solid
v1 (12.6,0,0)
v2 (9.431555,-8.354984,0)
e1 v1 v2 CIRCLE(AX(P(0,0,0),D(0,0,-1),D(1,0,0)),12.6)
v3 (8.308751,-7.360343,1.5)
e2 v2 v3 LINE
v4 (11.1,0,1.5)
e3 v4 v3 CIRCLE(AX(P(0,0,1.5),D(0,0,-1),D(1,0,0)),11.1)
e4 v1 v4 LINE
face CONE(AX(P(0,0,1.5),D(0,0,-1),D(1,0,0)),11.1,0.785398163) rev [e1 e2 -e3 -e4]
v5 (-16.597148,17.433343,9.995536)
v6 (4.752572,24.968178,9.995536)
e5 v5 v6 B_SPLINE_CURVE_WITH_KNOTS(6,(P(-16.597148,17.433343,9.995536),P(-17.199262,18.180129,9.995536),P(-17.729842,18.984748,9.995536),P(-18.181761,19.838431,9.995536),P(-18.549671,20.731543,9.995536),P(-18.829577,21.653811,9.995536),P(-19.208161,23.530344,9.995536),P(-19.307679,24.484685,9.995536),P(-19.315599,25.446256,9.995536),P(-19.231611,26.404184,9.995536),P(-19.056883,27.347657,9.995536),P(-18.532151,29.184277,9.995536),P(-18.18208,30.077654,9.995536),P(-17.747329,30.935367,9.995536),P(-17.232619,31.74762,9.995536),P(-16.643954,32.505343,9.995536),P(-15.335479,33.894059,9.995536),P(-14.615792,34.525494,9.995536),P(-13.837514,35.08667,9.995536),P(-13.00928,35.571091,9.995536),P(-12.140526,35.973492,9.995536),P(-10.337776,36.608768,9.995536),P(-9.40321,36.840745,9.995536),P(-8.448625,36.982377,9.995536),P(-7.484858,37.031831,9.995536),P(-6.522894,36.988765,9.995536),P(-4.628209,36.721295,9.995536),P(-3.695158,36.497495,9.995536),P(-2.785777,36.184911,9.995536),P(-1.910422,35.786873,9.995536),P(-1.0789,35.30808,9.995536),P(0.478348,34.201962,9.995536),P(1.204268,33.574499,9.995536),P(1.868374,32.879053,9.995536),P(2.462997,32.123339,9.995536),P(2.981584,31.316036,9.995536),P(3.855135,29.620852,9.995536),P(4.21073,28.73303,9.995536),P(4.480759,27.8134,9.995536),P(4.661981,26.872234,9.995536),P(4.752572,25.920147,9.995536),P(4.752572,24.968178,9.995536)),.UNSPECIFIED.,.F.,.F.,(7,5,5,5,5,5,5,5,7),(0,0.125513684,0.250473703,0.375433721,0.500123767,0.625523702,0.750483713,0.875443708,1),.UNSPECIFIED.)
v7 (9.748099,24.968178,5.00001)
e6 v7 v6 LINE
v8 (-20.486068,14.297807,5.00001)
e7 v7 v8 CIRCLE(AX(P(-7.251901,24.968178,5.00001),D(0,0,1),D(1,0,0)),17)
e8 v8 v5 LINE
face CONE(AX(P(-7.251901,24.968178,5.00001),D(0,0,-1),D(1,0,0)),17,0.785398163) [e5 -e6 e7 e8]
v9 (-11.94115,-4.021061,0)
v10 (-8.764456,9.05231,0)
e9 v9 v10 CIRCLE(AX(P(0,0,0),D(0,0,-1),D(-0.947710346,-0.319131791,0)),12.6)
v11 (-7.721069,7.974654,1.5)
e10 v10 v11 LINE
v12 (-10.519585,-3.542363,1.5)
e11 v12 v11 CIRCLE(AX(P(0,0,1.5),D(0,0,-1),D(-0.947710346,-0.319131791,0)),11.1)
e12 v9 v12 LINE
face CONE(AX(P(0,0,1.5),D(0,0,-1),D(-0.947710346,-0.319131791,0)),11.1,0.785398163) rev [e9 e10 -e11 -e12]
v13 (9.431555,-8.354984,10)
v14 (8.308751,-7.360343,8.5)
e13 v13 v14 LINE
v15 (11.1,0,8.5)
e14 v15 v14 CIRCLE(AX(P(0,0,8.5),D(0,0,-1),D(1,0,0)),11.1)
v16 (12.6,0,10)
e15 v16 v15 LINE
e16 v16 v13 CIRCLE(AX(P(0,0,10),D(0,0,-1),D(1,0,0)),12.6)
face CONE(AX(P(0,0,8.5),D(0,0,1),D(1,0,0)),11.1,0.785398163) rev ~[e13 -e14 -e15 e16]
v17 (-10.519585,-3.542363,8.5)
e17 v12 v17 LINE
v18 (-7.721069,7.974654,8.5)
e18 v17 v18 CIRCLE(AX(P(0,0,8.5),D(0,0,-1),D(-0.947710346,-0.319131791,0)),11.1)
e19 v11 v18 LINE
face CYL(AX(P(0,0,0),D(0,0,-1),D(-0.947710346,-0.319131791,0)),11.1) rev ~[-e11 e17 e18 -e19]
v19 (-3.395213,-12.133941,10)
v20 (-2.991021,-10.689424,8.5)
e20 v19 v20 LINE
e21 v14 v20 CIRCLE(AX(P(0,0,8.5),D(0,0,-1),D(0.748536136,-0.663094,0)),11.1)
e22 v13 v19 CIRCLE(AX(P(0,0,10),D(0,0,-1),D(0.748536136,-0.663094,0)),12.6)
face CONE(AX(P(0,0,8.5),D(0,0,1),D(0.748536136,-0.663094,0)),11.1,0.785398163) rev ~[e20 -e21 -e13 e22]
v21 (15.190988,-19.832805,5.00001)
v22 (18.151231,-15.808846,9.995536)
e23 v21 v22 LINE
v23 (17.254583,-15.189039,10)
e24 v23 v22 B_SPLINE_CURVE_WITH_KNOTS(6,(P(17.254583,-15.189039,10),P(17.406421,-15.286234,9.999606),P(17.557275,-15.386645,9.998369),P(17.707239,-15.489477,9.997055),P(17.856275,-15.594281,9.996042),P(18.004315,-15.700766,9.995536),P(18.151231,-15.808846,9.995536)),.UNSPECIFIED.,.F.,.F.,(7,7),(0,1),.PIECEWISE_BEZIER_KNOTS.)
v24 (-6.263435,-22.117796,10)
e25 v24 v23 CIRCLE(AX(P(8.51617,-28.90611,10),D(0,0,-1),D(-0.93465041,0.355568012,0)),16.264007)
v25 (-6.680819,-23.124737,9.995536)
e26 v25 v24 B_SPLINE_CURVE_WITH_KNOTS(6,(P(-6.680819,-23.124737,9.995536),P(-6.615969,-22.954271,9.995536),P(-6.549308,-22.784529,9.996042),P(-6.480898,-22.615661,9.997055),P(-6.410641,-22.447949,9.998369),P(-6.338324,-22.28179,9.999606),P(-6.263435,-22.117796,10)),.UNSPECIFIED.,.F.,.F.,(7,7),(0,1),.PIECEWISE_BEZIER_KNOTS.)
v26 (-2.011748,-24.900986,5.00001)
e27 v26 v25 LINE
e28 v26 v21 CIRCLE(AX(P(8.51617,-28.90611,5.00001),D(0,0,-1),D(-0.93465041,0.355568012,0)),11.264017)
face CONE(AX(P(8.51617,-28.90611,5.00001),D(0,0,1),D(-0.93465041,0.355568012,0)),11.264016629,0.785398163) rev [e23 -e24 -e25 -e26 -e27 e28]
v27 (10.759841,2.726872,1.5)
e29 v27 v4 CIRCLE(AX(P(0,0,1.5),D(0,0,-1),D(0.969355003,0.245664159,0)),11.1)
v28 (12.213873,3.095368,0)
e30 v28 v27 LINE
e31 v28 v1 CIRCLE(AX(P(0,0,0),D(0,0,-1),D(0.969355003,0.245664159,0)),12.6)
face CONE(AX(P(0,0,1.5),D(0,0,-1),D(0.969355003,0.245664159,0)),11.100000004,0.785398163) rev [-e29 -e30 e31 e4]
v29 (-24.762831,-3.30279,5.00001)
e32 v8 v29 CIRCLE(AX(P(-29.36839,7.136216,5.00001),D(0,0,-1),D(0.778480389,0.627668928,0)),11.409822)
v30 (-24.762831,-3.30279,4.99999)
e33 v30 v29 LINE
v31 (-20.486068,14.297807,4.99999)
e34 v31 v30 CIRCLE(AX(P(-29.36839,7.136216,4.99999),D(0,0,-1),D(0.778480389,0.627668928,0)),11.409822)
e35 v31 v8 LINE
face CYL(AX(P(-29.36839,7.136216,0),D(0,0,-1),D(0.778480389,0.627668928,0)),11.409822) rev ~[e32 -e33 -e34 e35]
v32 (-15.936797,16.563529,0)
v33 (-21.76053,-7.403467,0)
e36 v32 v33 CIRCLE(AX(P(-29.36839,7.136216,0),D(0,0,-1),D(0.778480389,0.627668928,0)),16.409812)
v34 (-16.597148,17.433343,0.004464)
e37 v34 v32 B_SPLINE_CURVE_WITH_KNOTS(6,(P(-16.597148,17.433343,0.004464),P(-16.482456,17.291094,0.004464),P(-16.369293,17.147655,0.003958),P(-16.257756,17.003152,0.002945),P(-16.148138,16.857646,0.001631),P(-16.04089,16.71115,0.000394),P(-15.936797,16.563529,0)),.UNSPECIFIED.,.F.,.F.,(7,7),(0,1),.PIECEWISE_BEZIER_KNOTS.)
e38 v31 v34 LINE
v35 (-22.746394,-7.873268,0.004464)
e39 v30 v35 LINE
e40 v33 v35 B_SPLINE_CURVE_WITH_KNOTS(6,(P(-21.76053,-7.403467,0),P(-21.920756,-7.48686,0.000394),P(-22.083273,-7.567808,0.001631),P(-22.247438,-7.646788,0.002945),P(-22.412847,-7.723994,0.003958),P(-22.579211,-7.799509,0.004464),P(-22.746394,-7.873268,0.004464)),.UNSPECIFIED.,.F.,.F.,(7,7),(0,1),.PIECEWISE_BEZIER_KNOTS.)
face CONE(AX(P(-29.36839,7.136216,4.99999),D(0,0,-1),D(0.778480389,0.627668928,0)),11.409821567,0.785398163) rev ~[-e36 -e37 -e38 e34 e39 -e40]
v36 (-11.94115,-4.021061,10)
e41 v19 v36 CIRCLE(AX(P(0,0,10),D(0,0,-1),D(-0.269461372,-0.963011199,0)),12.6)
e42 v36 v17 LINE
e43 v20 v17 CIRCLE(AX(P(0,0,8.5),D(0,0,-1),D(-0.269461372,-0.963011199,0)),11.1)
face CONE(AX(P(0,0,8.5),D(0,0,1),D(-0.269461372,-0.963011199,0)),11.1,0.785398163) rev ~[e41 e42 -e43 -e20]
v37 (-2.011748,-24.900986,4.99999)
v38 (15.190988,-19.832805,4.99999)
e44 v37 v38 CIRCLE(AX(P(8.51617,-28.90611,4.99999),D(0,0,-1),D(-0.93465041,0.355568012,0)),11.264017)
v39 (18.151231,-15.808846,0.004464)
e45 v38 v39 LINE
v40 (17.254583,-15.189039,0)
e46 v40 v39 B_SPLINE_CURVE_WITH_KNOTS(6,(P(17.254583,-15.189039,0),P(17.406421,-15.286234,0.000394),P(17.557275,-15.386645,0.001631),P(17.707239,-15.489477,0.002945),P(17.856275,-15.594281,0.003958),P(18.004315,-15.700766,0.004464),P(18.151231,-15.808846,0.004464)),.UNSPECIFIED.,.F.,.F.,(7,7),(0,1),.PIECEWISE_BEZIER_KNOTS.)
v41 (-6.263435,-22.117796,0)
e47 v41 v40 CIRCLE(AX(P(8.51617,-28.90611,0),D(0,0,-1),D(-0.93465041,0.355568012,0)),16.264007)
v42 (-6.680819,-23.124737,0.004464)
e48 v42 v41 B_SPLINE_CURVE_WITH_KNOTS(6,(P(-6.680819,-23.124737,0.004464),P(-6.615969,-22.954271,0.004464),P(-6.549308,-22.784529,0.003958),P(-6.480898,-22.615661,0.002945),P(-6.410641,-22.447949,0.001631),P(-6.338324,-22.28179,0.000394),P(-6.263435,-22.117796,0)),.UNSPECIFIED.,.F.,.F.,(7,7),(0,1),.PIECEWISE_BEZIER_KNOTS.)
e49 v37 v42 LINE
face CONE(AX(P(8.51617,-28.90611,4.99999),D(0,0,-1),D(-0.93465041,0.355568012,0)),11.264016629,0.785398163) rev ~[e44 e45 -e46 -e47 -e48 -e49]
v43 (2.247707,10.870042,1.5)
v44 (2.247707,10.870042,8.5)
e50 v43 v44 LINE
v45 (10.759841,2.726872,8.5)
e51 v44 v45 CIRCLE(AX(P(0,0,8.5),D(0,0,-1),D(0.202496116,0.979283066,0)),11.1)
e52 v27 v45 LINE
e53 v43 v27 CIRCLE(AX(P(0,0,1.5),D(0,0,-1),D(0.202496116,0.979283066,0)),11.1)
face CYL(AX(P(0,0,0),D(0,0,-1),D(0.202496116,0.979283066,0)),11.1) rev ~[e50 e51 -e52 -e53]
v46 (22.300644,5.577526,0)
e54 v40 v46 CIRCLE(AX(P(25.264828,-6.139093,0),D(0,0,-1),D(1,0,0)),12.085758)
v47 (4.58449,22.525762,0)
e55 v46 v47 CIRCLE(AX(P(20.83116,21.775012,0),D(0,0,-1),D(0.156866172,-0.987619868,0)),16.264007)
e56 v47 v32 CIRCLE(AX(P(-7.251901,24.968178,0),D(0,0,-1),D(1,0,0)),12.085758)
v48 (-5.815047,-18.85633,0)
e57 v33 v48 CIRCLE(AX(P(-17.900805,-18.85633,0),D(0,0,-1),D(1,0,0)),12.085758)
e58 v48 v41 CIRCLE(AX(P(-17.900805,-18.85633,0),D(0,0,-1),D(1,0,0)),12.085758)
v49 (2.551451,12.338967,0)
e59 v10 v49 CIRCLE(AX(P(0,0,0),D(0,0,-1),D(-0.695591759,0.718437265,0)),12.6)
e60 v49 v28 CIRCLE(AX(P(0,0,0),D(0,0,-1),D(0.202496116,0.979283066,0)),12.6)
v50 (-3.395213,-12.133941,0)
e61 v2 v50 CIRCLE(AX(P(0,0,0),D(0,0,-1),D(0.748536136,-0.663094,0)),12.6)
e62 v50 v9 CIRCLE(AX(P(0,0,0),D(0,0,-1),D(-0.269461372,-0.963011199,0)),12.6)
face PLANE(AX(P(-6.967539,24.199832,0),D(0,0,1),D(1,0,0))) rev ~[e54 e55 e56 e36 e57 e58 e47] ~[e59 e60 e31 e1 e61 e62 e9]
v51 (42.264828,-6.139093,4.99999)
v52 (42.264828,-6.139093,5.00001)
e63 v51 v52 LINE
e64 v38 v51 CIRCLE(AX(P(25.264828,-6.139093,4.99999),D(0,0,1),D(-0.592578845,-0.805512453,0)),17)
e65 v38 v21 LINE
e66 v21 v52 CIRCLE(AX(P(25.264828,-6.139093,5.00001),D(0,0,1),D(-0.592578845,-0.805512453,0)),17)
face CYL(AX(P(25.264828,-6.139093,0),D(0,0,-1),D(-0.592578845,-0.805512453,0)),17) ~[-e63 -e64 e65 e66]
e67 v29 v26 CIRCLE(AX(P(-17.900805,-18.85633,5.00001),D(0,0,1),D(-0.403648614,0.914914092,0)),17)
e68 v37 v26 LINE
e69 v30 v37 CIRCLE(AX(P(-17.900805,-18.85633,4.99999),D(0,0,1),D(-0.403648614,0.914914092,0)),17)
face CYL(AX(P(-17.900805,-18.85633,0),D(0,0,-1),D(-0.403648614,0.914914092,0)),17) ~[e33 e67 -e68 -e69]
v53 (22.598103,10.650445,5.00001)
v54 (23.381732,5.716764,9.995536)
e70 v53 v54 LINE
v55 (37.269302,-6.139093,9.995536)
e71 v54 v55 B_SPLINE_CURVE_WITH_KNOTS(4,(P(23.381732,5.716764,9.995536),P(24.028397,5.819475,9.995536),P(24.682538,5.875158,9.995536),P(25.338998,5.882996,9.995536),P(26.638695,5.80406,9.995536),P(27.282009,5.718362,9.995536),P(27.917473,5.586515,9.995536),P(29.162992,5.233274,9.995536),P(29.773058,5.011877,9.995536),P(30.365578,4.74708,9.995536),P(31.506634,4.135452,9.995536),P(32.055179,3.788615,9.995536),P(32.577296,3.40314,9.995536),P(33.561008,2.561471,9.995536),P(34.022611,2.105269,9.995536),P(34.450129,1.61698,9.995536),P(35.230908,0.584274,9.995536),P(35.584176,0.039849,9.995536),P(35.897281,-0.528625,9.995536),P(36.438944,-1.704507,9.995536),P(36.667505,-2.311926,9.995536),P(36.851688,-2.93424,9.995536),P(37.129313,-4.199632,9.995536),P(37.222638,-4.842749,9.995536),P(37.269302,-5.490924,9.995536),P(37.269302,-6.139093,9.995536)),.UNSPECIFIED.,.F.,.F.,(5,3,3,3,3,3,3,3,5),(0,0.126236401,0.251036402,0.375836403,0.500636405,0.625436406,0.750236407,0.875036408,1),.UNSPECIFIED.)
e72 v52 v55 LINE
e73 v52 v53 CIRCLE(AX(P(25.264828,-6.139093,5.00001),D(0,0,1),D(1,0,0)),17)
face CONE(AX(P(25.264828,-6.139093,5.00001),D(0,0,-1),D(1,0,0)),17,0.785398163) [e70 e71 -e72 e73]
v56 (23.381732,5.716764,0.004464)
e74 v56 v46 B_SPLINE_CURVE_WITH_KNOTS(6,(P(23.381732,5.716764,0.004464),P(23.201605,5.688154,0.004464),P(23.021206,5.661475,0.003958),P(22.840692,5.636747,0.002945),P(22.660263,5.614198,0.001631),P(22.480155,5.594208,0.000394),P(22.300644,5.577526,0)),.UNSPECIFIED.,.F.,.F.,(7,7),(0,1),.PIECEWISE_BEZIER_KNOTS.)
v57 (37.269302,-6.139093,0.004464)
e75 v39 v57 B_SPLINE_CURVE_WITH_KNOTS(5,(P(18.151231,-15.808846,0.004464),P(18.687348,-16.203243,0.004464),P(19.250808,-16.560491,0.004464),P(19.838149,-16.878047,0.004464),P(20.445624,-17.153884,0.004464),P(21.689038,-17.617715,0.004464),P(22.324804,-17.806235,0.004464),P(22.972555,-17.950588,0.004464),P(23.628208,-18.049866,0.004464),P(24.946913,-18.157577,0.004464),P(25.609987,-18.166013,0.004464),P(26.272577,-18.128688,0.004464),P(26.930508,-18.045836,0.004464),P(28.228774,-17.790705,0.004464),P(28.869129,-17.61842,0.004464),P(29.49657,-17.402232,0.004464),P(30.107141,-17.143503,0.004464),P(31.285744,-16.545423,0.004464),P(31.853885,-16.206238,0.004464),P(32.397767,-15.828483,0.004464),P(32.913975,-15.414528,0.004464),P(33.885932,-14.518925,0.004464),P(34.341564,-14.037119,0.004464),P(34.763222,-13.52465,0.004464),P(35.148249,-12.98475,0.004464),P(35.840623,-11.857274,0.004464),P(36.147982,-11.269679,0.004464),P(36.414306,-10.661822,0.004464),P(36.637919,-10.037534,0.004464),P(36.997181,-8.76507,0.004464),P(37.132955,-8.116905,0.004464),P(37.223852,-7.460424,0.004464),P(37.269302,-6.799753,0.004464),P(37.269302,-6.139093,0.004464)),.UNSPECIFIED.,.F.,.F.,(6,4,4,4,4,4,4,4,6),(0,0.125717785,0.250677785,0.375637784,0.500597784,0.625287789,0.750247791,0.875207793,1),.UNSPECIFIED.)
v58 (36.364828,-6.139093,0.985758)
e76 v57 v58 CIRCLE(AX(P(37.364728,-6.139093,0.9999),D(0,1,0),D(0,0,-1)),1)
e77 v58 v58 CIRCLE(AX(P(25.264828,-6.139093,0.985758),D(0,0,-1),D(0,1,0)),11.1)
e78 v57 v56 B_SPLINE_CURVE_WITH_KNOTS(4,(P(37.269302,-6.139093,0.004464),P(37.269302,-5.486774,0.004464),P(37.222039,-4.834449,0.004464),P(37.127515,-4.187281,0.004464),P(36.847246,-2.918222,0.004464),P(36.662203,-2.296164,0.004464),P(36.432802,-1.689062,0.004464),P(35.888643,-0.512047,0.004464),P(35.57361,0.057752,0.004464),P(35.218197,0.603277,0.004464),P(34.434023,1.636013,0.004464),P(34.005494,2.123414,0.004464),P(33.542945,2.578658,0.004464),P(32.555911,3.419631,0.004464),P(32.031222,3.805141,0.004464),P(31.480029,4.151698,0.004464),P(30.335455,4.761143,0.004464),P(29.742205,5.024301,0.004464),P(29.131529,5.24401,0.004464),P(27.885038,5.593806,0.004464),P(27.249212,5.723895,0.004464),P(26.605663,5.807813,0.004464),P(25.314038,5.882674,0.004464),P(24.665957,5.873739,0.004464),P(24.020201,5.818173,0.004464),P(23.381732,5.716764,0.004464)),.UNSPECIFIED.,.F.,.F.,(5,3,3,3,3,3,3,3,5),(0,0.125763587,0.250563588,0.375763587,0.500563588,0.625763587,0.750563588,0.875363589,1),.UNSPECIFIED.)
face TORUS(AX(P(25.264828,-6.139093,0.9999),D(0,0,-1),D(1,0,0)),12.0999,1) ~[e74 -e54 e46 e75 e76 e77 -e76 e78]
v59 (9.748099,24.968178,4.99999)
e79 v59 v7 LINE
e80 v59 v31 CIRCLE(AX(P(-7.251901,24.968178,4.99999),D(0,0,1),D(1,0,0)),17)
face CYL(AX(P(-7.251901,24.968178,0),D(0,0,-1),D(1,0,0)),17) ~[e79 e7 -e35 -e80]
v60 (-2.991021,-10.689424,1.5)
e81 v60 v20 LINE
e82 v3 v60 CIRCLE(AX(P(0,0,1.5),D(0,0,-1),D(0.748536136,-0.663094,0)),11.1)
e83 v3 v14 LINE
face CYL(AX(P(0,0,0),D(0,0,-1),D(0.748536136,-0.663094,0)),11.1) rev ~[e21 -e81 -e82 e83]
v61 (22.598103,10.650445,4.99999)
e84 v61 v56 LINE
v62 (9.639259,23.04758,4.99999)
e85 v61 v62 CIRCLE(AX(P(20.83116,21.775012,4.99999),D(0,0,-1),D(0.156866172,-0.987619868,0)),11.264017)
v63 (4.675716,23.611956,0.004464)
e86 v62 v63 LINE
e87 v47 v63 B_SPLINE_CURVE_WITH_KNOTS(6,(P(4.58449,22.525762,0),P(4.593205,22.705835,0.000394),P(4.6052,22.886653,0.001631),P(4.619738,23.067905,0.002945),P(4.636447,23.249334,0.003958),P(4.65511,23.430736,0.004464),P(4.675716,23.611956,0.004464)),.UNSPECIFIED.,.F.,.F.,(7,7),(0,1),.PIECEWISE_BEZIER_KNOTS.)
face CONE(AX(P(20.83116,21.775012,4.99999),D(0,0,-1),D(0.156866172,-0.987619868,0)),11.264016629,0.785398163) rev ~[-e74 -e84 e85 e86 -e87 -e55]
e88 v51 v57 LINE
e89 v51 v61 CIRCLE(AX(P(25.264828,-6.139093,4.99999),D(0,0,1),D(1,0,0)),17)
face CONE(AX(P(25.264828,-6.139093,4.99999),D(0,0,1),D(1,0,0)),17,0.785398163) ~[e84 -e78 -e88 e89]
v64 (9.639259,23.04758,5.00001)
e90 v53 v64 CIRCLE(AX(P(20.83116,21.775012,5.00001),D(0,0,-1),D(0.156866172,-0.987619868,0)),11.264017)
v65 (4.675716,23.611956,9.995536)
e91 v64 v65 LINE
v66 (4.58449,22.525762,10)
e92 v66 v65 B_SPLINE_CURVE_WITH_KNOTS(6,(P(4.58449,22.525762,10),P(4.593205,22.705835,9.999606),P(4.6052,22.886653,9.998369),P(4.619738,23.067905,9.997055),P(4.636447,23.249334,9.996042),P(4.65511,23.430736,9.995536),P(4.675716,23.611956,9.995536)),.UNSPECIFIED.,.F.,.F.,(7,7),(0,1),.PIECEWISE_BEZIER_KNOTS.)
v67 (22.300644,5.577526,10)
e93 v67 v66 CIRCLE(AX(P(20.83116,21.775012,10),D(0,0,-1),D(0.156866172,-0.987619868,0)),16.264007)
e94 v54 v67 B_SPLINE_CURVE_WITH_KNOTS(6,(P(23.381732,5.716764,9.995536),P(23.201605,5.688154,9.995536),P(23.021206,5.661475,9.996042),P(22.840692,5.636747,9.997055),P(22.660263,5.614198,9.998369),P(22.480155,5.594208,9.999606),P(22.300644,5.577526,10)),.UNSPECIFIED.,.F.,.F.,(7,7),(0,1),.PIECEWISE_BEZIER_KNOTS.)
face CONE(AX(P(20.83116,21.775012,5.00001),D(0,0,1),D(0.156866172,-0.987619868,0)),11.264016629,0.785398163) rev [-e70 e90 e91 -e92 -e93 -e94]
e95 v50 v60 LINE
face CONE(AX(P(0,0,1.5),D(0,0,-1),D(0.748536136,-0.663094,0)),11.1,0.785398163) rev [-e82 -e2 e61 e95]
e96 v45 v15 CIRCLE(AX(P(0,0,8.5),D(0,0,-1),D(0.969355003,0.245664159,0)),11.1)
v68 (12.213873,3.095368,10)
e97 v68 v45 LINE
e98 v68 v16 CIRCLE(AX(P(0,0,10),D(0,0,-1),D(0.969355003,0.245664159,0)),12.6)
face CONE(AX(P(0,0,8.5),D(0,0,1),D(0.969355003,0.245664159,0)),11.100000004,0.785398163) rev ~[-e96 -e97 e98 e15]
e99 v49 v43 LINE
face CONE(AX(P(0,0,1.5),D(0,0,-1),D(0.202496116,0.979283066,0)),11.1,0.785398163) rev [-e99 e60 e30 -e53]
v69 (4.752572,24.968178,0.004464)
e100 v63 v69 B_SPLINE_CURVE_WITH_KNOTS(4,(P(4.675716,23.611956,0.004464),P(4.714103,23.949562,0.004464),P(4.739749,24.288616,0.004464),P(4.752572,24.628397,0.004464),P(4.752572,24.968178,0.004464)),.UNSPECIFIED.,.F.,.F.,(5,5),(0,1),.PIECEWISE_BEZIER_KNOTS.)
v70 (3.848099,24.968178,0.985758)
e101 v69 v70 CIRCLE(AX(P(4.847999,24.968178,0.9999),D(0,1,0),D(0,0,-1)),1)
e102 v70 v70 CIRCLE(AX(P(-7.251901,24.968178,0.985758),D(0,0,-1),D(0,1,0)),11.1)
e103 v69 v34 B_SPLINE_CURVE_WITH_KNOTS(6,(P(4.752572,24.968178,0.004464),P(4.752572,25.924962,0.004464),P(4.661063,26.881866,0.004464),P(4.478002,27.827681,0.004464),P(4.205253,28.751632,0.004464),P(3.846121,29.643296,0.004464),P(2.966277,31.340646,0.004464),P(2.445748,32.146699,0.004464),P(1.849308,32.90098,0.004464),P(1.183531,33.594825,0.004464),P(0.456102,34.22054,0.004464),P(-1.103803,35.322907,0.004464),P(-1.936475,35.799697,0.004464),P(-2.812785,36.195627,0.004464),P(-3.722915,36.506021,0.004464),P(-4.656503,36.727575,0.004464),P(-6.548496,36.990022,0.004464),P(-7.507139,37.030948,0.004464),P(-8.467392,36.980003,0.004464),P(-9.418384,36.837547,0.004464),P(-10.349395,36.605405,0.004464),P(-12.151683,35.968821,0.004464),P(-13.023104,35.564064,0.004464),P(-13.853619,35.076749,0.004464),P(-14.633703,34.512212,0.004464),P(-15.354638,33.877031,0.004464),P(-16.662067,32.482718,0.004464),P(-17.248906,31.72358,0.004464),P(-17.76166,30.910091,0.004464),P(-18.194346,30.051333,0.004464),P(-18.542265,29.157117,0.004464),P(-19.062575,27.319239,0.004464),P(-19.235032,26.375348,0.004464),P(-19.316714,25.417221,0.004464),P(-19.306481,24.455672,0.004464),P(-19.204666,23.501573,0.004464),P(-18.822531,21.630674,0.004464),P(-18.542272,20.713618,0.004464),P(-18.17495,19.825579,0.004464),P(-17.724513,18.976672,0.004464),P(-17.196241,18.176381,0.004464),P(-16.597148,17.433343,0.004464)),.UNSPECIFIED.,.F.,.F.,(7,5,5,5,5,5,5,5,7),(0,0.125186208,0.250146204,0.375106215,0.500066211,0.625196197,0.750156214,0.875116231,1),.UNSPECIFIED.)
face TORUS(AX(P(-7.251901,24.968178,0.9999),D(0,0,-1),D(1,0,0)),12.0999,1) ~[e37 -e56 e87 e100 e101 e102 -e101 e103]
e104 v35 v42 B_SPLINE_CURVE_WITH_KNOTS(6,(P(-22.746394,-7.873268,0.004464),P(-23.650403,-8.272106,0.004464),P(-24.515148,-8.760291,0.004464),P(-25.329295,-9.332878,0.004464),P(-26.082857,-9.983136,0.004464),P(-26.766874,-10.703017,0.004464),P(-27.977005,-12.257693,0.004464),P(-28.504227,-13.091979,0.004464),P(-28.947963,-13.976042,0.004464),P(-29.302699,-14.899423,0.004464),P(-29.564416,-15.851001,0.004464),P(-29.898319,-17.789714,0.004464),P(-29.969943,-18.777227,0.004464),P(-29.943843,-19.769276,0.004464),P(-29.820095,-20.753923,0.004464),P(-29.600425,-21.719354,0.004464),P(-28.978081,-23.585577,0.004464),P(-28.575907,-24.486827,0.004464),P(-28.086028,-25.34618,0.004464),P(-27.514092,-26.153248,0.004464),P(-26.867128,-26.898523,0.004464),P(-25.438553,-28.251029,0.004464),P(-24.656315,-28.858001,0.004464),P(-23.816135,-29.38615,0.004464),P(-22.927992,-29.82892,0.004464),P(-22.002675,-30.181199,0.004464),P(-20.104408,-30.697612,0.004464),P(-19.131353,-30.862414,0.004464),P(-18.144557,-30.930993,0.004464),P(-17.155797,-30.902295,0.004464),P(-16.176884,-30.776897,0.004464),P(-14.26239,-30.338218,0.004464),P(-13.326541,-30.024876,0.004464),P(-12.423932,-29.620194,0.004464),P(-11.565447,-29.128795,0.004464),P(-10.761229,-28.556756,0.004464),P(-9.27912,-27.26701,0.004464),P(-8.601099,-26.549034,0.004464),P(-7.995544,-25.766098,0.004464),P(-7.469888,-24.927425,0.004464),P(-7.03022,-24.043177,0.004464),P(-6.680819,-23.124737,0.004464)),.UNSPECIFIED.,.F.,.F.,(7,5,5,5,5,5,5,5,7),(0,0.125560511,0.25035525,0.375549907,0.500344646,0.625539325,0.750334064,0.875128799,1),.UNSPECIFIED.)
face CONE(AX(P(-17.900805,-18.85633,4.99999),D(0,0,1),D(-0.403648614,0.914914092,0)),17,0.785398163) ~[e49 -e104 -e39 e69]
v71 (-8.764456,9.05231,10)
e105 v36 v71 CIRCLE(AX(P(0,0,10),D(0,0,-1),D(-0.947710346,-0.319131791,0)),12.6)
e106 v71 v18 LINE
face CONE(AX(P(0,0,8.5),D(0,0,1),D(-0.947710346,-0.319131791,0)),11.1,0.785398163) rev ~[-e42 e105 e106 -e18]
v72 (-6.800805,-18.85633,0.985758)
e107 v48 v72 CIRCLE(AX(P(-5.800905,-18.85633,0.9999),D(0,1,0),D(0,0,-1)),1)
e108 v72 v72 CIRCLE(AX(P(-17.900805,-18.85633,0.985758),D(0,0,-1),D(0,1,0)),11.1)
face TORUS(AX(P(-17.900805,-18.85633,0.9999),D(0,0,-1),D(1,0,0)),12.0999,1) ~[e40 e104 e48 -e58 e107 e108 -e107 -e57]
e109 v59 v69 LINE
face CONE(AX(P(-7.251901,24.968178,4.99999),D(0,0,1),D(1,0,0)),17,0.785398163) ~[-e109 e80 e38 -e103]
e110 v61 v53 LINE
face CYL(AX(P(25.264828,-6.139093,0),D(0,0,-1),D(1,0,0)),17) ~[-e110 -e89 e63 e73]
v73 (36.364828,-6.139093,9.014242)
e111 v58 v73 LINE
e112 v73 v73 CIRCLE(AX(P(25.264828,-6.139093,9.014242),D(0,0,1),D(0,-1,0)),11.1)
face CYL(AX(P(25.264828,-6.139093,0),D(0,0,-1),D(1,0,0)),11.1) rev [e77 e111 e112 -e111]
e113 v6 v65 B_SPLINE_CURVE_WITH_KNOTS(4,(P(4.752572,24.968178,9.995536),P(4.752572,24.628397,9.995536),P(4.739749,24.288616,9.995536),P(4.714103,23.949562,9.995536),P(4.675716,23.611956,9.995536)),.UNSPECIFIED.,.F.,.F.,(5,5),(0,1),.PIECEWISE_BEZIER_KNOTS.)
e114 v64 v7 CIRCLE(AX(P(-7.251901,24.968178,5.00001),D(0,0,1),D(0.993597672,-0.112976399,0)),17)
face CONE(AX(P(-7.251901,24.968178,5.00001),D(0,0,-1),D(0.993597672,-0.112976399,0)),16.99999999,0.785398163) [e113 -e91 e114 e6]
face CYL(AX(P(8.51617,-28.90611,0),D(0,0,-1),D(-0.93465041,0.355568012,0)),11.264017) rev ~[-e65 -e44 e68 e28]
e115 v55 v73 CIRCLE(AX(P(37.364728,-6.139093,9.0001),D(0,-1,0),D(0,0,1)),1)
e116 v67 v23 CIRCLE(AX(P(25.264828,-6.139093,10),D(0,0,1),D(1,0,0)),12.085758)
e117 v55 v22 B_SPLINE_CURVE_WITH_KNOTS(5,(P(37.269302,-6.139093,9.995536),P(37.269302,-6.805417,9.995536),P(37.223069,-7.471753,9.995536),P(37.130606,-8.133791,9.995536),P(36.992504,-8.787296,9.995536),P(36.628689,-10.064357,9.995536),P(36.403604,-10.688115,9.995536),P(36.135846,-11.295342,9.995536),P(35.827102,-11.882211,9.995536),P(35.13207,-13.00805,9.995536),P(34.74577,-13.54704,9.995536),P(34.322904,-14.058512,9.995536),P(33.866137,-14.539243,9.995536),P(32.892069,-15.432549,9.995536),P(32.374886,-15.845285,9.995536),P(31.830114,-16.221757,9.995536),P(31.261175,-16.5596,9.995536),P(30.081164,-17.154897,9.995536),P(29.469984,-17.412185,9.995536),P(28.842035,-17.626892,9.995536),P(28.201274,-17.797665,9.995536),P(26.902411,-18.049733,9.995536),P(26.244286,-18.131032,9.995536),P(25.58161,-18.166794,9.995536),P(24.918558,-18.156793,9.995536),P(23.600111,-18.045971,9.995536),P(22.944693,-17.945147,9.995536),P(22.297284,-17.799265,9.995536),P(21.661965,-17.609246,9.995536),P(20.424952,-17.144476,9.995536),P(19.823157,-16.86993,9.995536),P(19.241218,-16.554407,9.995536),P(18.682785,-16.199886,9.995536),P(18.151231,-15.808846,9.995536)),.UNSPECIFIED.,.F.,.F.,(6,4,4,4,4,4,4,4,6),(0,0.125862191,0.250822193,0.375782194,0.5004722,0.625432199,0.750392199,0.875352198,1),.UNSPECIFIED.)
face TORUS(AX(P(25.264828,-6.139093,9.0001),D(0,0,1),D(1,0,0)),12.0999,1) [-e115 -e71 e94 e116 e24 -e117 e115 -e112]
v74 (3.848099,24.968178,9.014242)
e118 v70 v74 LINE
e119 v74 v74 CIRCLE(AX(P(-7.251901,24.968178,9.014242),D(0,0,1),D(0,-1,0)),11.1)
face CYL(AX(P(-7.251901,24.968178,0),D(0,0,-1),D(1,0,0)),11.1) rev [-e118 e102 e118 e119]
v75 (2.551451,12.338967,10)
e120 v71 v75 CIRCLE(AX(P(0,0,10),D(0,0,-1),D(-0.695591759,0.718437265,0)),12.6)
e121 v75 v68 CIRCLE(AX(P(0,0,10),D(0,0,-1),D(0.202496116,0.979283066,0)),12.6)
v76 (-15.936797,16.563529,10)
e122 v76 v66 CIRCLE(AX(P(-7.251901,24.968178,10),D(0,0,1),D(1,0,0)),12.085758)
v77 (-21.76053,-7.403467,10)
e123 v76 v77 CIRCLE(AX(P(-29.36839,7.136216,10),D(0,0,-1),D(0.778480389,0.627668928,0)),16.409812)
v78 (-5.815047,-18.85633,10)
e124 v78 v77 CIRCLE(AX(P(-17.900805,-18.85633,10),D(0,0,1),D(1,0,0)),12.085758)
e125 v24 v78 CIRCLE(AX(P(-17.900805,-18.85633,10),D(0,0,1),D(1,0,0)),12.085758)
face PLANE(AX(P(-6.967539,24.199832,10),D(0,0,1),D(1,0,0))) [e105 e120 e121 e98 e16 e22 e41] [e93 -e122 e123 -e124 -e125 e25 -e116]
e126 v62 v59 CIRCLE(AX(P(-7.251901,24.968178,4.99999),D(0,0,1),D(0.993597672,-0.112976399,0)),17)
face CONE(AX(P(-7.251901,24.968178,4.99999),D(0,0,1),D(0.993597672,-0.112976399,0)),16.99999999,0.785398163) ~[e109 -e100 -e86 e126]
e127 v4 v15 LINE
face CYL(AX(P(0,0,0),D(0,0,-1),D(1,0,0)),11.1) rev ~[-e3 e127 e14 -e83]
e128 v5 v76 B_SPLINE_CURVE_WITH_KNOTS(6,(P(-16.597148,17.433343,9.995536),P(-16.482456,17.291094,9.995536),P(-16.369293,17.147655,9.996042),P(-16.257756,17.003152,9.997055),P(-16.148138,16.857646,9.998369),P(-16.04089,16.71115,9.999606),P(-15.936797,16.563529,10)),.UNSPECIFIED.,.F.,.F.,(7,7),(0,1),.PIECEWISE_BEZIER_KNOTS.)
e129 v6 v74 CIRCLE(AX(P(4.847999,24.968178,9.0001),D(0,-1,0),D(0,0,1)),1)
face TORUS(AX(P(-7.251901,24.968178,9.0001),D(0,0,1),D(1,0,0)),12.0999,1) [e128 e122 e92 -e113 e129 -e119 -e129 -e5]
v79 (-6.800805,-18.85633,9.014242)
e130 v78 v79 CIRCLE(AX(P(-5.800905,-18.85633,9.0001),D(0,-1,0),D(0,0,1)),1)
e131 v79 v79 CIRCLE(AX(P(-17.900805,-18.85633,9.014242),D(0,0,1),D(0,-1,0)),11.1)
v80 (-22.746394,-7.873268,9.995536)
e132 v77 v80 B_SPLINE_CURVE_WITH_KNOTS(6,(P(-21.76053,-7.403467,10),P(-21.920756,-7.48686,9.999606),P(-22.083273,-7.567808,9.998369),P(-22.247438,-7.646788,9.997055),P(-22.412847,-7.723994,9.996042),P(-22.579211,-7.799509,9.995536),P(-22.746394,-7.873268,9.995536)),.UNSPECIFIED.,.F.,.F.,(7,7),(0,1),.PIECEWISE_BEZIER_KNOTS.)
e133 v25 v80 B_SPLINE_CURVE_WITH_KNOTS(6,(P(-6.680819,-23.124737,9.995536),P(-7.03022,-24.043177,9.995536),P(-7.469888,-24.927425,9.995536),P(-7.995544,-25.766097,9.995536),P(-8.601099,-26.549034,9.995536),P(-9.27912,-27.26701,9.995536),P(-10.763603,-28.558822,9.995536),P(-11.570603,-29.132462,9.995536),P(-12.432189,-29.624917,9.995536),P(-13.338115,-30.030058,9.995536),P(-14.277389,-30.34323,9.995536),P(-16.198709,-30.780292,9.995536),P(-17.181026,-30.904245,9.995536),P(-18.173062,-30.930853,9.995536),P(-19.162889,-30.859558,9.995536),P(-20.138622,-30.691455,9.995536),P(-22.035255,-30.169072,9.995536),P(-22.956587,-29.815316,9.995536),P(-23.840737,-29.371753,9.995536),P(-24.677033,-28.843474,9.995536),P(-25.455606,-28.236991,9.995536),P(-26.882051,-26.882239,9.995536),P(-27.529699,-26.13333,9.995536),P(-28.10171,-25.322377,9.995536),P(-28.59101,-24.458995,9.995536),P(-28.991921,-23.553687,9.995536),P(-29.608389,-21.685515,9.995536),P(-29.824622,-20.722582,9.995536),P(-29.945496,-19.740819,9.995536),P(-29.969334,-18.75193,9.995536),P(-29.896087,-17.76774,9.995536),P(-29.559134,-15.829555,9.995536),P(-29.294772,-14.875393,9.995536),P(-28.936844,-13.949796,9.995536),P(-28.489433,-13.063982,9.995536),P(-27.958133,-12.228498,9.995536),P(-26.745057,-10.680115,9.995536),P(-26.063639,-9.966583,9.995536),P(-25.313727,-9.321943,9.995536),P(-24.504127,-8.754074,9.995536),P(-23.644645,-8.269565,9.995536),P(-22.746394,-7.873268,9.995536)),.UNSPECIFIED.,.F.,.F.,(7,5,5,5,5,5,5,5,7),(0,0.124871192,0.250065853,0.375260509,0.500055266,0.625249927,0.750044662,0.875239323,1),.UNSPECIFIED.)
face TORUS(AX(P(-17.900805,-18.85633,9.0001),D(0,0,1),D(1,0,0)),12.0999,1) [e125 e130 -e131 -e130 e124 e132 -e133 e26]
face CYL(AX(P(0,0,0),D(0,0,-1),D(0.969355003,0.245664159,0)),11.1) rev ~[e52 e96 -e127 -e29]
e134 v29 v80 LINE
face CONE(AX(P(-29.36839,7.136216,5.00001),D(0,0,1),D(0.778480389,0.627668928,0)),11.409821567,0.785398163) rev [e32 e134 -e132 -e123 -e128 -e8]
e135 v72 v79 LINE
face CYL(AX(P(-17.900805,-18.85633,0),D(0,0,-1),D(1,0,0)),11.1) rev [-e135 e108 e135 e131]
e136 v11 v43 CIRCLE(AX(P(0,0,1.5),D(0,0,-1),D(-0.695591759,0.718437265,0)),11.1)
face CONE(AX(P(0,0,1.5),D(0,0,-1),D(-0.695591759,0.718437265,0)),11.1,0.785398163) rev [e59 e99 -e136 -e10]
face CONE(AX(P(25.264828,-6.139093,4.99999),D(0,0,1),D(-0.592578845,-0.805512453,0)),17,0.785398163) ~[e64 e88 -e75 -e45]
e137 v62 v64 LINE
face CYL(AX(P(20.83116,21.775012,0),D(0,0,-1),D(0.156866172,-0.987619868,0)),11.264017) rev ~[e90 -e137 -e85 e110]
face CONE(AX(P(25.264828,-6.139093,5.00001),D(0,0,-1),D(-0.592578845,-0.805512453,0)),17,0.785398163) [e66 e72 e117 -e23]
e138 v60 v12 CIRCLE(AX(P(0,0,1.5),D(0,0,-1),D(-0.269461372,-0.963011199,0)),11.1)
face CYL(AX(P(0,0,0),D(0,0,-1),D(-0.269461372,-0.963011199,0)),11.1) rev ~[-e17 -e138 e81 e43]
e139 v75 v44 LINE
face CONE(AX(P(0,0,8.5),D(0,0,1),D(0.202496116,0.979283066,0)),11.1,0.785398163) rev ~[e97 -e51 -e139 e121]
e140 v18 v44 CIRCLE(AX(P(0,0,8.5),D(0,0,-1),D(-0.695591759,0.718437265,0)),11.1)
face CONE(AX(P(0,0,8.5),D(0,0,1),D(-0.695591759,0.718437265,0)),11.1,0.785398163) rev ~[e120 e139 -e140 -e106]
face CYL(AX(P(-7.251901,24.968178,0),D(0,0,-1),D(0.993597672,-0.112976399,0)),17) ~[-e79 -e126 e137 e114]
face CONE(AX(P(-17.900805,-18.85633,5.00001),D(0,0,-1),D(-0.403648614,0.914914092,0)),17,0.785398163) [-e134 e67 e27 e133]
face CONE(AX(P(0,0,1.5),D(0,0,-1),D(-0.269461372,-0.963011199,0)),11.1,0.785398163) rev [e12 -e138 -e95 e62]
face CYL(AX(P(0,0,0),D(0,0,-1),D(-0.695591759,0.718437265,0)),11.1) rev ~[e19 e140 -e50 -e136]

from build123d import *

# Parameters (mm, degrees)
F0_R     = 11.1
F1_DEPTH = 10
F2_SIZE  = 4.99999
F4_SIZE  = 1.5


# Not quite as in the source:
# - a fillet or chamfer that OpenCascade refuses, or shapes differently, is made with other operations: its cross-section is extruded or revolved along the edge and cut away or added
# - a fillet or chamfer is up to 0.001 mm smaller than in the source, because OpenCascade refuses the exact size


with BuildPart() as f1:
    # F0 (on Top) → F1 (new body)
    with BuildSketch(Plane.XY):
        with BuildLine():
            ThreePointArc((-8.9008040787, 8.0483344086), (-3.3470312857, 11.5237746235), (3.2044142943, 11.5642435563))
            ThreePointArc((3.2044142943, 11.5642435563), (7.5784009732, 16.6578149501), (9.6392593011, 23.047579575))
            ThreePointArc((9.6392593011, 23.047579575), (9.7208671752, 24.0063382249), (9.7480988809, 24.9681783508))
            ThreePointArc((9.7480988809, 24.9681783508), (-12.909602396, 40.9990989813), (-20.4860677382, 14.297806572))
            ThreePointArc((-20.4860677382, 14.297806572), (-15.3228623754, 10.0062404951), (-8.9008040787, 8.0483344086))
        make_face()
        with Locations((-7.2519011191, 24.9681783508)):
            Circle(F0_R, mode=Mode.SUBTRACT)
        with BuildLine():
            ThreePointArc((3.2044142943, 11.5642435563), (8.2952723159, 8.6711277931), (11.410994073, 3.7133831296))
            ThreePointArc((11.410994073, 3.7133831296), (16.3058703698, 8.3086431928), (22.5981031738, 10.6504449244))
            ThreePointArc((22.5981031738, 10.6504449244), (13.0446528896, 13.6357009046), (9.6392593011, 23.047579575))
            ThreePointArc((9.6392593011, 23.047579575), (7.5784009732, 16.6578149501), (3.2044142943, 11.5642435563))
        make_face()
        with BuildLine():
            ThreePointArc((22.5981031738, 10.6504449244), (16.3058703698, 8.3086431928), (11.410994073, 3.7133831296))
            ThreePointArc((11.410994073, 3.7133831296), (11.8518338006, 1.8799030726), (12, 0))
            ThreePointArc((12, 0), (11.07283247, -4.6251898438), (8.4346031515, -8.5356587137))
            ThreePointArc((8.4346031515, -8.5356587137), (10.6749837374, -14.8647126588), (15.1909877347, -19.8328045366))
            ThreePointArc((15.1909877347, -19.8328045366), (32.9376604929, -21.3090514083), (42.264828105, -6.139092834))
            ThreePointArc((42.264828105, -6.139092834), (36.302619464, 6.7902212203), (22.5981031738, 10.6504449244))
        make_face()
        with Locations((25.264828105, -6.139092834)):
            Circle(F0_R, mode=Mode.SUBTRACT)
        with BuildLine():
            ThreePointArc((15.1909877347, -19.8328045366), (10.6749837374, -14.8647126588), (8.4346031515, -8.5356587137))
            ThreePointArc((8.4346031515, -8.5356587137), (3.3912632474, -11.5108354861), (-2.459549488, -11.7452380272))
            ThreePointArc((-2.459549488, -11.7452380272), (-1.295062841, -15.2163673164), (-0.9008049677, -18.8563300117))
            ThreePointArc((-0.9008049677, -18.8563300117), (-1.1808473044, -21.9292790409), (-2.0117479955, -24.9009862083))
            ThreePointArc((-2.0117479955, -24.9009862083), (5.3328992991, -18.1012566756), (15.1909877347, -19.8328045366))
        make_face()
        with BuildLine():
            ThreePointArc((-0.9008049677, -18.8563300117), (-1.295062841, -15.2163673164), (-2.459549488, -11.7452380272))
            ThreePointArc((-2.459549488, -11.7452380272), (-8.2619099851, -8.7029215438), (-11.6015857751, -3.0664649849))
            ThreePointArc((-11.6015857751, -3.0664649849), (-18.2060105223, -1.859069951), (-24.7628314098, -3.3027904432))
            ThreePointArc((-24.7628314098, -3.3027904432), (-29.6051774466, -31.1854688655), (-2.0117479955, -24.9009862083))
            ThreePointArc((-2.0117479955, -24.9009862083), (-1.1808473044, -21.9292790409), (-0.9008049677, -18.8563300117))
        make_face()
        with Locations((-17.9008049677, -18.8563300117)):
            Circle(F0_R, mode=Mode.SUBTRACT)
        with BuildLine():
            ThreePointArc((-11.6015857751, -3.0664649849), (-11.6606898946, 2.8334274618), (-8.9008040787, 8.0483344086))
            ThreePointArc((-8.9008040787, 8.0483344086), (-15.3228623754, 10.0062404951), (-20.4860677382, 14.297806572))
            ThreePointArc((-20.4860677382, 14.297806572), (-18.2811908203, 4.4421409517), (-24.7628314098, -3.3027904432))
            ThreePointArc((-24.7628314098, -3.3027904432), (-18.2060105223, -1.859069951), (-11.6015857751, -3.0664649849))
        make_face()
        with BuildLine():
            ThreePointArc((-7.7210685302, 7.9746536446), (-3.0960039393, 10.6594915267), (2.2477068882, 10.8700420305))
            ThreePointArc((2.2477068882, 10.8700420305), (2.732096018, 11.208825126), (3.2044142943, 11.5642435563))
            ThreePointArc((3.2044142943, 11.5642435563), (-3.3470312857, 11.5237746235), (-8.9008040787, 8.0483344086))
            ThreePointArc((-8.9008040787, 8.0483344086), (-8.3115768891, 8.0012373401), (-7.7210685302, 7.9746536446))
        make_face()
        with BuildLine():
            ThreePointArc((-10.5195848427, -3.5423628749), (-10.7861381525, 2.6209204022), (-7.7210685302, 7.9746536446))
            ThreePointArc((-7.7210685302, 7.9746536446), (-8.3115768891, 8.0012373401), (-8.9008040787, 8.0483344086))
            ThreePointArc((-8.9008040787, 8.0483344086), (-11.6606898946, 2.8334274618), (-11.6015857751, -3.0664649849))
            ThreePointArc((-11.6015857751, -3.0664649849), (-11.0564478261, -3.2950069536), (-10.5195848427, -3.5423628749))
        make_face()
        with BuildLine():
            ThreePointArc((2.2477068882, 10.8700420305), (7.6731268923, 8.0207932086), (10.759840528, 2.7268721665))
            ThreePointArc((10.759840528, 2.7268721665), (11.0768405192, 3.2257888132), (11.410994073, 3.7133831296))
            ThreePointArc((11.410994073, 3.7133831296), (8.2952723159, 8.6711277931), (3.2044142943, 11.5642435563))
            ThreePointArc((3.2044142943, 11.5642435563), (2.732096018, 11.208825126), (2.2477068882, 10.8700420305))
        make_face()
        with BuildLine():
            ThreePointArc((10.759840528, 2.7268721665), (11.0146318563, 1.3740033005), (11.1, 0))
            ThreePointArc((11.1, 0), (10.3787556413, -3.9359155654), (8.3087511103, -7.3603434015))
            ThreePointArc((8.3087511103, -7.3603434015), (8.3614588742, -7.9490952222), (8.4346031515, -8.5356587137))
            ThreePointArc((8.4346031515, -8.5356587137), (11.07283247, -4.6251898438), (12, 0))
            ThreePointArc((12, 0), (11.8518338006, 1.8799030726), (11.410994073, 3.7133831296))
            ThreePointArc((11.410994073, 3.7133831296), (11.0768405192, 3.2257888132), (10.759840528, 2.7268721665))
        make_face()
        with BuildLine():
            ThreePointArc((8.4346031515, -8.5356587137), (8.3614588742, -7.9490952222), (8.3087511103, -7.3603434015))
            ThreePointArc((8.3087511103, -7.3603434015), (3.1369185038, -10.6475228246), (-2.9910212262, -10.6894243074))
            ThreePointArc((-2.9910212262, -10.6894243074), (-2.7161060538, -11.2127105225), (-2.459549488, -11.7452380272))
            ThreePointArc((-2.459549488, -11.7452380272), (3.3912632474, -11.5108354861), (8.4346031515, -8.5356587137))
        make_face()
        with BuildLine():
            ThreePointArc((-2.459549488, -11.7452380272), (-2.7161060538, -11.2127105225), (-2.9910212262, -10.6894243074))
            ThreePointArc((-2.9910212262, -10.6894243074), (-7.6422667362, -8.0502024281), (-10.5195848427, -3.5423628749))
            ThreePointArc((-10.5195848427, -3.5423628749), (-11.0564478261, -3.2950069536), (-11.6015857751, -3.0664649849))
            ThreePointArc((-11.6015857751, -3.0664649849), (-8.2619099851, -8.7029215438), (-2.459549488, -11.7452380272))
        make_face()
    extrude(amount=F1_DEPTH)

    # F2 (size 5 in the source; OpenCascade refuses exactly that, so slightly less here)
    f2_edges = [f1.edges().sort_by_distance(p)[0] for p in [
        (-29.605177, -31.185469, 10),
        (41.784139, -10.153115, 0),
    ]]
    chamfer(f2_edges, length=F2_SIZE)

    # F3: fillet of radius 1 on 6 edges, made by hand

    # F3_s1 → F3_t2 (revolve, cut)
    with BuildSketch(Plane.XZ.offset(6.139092834)):
        with BuildLine():
            ThreePointArc((37.364728105, 10.0001), (36.6576213238, 9.7072067812), (36.364728105, 9.0001))
            Line((36.364728105, 9.0001), (36.344728105, 9.0001))
            ThreePointArc((36.344728105, 9.0001), (36.344828105, 9.50005), (36.344828105, 10))
            Line((36.344828105, 10), (36.364828105, 10.02))
            ThreePointArc((36.364828105, 10.02), (36.864778105, 10.02), (37.364728105, 10.0201))
            Line((37.364728105, 10.0201), (37.364728105, 10.0001))
        make_face()
    revolve(axis=Axis((25.264828105, -6.139092834, 10), (0, 0, 1)), mode=Mode.SUBTRACT)

    # F3_s3 → F3_t4 (revolve, cut)
    with BuildSketch(Plane.XZ.offset(-24.9681783508)):
        with BuildLine():
            ThreePointArc((4.8479988809, 10.0001), (4.1408920997, 9.7072067812), (3.8479988809, 9.0001))
            Line((3.8479988809, 9.0001), (3.8279988809, 9.0001))
            ThreePointArc((3.8279988809, 9.0001), (3.8280988809, 9.50005), (3.8280988809, 10))
            Line((3.8280988809, 10), (3.8480988809, 10.02))
            ThreePointArc((3.8480988809, 10.02), (4.3480488809, 10.02), (4.8479988809, 10.0201))
            Line((4.8479988809, 10.0201), (4.8479988809, 10.0001))
        make_face()
    revolve(axis=Axis((-7.2519011191, 24.9681783508, 10), (0, 0, 1)), mode=Mode.SUBTRACT)

    # F3_s5 → F3_t6 (revolve, cut)
    with BuildSketch(Plane.XZ.offset(18.8563300117)):
        with BuildLine():
            ThreePointArc((-5.8009049677, 10.0001), (-6.5080117489, 9.7072067812), (-6.8009049677, 9.0001))
            Line((-6.8009049677, 9.0001), (-6.8209049677, 9.0001))
            ThreePointArc((-6.8209049677, 9.0001), (-6.8208049677, 9.50005), (-6.8208049677, 10))
            Line((-6.8208049677, 10), (-6.8008049677, 10.02))
            ThreePointArc((-6.8008049677, 10.02), (-6.3008549677, 10.02), (-5.8009049677, 10.0201))
            Line((-5.8009049677, 10.0201), (-5.8009049677, 10.0001))
        make_face()
    revolve(axis=Axis((-17.9008049677, -18.8563300117, 10), (0, 0, 1)), mode=Mode.SUBTRACT)

    # F3_s7 → F3_t8 (revolve, cut)
    with BuildSketch(Plane.XZ.offset(6.139092834)):
        with BuildLine():
            ThreePointArc((37.364728105, -0.0001), (36.6576213238, 0.2927932188), (36.364728105, 0.9999))
            Line((36.364728105, 0.9999), (36.344728105, 0.9999))
            ThreePointArc((36.344728105, 0.9999), (36.344828105, 0.49995), (36.344828105, 0))
            Line((36.344828105, 0), (36.364828105, -0.02))
            ThreePointArc((36.364828105, -0.02), (36.864778105, -0.02), (37.364728105, -0.0201))
            Line((37.364728105, -0.0201), (37.364728105, -0.0001))
        make_face()
    revolve(axis=Axis((25.264828105, -6.139092834, 0), (0, 0, 1)), mode=Mode.SUBTRACT)

    # F3_s9 → F3_t10 (revolve, cut)
    with BuildSketch(Plane.XZ.offset(-24.9681783508)):
        with BuildLine():
            ThreePointArc((4.8479988809, -0.0001), (4.1408920997, 0.2927932188), (3.8479988809, 0.9999))
            Line((3.8479988809, 0.9999), (3.8279988809, 0.9999))
            ThreePointArc((3.8279988809, 0.9999), (3.8280988809, 0.49995), (3.8280988809, 0))
            Line((3.8280988809, 0), (3.8480988809, -0.02))
            ThreePointArc((3.8480988809, -0.02), (4.3480488809, -0.02), (4.8479988809, -0.0201))
            Line((4.8479988809, -0.0201), (4.8479988809, -0.0001))
        make_face()
    revolve(axis=Axis((-7.2519011191, 24.9681783508, 0), (0, 0, 1)), mode=Mode.SUBTRACT)

    # F3_s11 → F3_t12 (revolve, cut)
    with BuildSketch(Plane.XZ.offset(18.8563300117)):
        with BuildLine():
            ThreePointArc((-5.8009049677, -0.0001), (-6.5080117489, 0.2927932188), (-6.8009049677, 0.9999))
            Line((-6.8009049677, 0.9999), (-6.8209049677, 0.9999))
            ThreePointArc((-6.8209049677, 0.9999), (-6.8208049677, 0.49995), (-6.8208049677, 0))
            Line((-6.8208049677, 0), (-6.8008049677, -0.02))
            ThreePointArc((-6.8008049677, -0.02), (-6.3008549677, -0.02), (-5.8009049677, -0.0201))
            Line((-5.8009049677, -0.0201), (-5.8009049677, -0.0001))
        make_face()
    revolve(axis=Axis((-17.9008049677, -18.8563300117, 0), (0, 0, 1)), mode=Mode.SUBTRACT)

    # F4
    f4_edges = [f1.edges().sort_by_distance(p)[0] for p in [
        (2.991021, 10.689424, 0),
        (-2.991021, -10.689424, 5),
        (2.991021, 10.689424, 10),
    ]]
    chamfer(f4_edges, length=F4_SIZE)


solid = f1.part
